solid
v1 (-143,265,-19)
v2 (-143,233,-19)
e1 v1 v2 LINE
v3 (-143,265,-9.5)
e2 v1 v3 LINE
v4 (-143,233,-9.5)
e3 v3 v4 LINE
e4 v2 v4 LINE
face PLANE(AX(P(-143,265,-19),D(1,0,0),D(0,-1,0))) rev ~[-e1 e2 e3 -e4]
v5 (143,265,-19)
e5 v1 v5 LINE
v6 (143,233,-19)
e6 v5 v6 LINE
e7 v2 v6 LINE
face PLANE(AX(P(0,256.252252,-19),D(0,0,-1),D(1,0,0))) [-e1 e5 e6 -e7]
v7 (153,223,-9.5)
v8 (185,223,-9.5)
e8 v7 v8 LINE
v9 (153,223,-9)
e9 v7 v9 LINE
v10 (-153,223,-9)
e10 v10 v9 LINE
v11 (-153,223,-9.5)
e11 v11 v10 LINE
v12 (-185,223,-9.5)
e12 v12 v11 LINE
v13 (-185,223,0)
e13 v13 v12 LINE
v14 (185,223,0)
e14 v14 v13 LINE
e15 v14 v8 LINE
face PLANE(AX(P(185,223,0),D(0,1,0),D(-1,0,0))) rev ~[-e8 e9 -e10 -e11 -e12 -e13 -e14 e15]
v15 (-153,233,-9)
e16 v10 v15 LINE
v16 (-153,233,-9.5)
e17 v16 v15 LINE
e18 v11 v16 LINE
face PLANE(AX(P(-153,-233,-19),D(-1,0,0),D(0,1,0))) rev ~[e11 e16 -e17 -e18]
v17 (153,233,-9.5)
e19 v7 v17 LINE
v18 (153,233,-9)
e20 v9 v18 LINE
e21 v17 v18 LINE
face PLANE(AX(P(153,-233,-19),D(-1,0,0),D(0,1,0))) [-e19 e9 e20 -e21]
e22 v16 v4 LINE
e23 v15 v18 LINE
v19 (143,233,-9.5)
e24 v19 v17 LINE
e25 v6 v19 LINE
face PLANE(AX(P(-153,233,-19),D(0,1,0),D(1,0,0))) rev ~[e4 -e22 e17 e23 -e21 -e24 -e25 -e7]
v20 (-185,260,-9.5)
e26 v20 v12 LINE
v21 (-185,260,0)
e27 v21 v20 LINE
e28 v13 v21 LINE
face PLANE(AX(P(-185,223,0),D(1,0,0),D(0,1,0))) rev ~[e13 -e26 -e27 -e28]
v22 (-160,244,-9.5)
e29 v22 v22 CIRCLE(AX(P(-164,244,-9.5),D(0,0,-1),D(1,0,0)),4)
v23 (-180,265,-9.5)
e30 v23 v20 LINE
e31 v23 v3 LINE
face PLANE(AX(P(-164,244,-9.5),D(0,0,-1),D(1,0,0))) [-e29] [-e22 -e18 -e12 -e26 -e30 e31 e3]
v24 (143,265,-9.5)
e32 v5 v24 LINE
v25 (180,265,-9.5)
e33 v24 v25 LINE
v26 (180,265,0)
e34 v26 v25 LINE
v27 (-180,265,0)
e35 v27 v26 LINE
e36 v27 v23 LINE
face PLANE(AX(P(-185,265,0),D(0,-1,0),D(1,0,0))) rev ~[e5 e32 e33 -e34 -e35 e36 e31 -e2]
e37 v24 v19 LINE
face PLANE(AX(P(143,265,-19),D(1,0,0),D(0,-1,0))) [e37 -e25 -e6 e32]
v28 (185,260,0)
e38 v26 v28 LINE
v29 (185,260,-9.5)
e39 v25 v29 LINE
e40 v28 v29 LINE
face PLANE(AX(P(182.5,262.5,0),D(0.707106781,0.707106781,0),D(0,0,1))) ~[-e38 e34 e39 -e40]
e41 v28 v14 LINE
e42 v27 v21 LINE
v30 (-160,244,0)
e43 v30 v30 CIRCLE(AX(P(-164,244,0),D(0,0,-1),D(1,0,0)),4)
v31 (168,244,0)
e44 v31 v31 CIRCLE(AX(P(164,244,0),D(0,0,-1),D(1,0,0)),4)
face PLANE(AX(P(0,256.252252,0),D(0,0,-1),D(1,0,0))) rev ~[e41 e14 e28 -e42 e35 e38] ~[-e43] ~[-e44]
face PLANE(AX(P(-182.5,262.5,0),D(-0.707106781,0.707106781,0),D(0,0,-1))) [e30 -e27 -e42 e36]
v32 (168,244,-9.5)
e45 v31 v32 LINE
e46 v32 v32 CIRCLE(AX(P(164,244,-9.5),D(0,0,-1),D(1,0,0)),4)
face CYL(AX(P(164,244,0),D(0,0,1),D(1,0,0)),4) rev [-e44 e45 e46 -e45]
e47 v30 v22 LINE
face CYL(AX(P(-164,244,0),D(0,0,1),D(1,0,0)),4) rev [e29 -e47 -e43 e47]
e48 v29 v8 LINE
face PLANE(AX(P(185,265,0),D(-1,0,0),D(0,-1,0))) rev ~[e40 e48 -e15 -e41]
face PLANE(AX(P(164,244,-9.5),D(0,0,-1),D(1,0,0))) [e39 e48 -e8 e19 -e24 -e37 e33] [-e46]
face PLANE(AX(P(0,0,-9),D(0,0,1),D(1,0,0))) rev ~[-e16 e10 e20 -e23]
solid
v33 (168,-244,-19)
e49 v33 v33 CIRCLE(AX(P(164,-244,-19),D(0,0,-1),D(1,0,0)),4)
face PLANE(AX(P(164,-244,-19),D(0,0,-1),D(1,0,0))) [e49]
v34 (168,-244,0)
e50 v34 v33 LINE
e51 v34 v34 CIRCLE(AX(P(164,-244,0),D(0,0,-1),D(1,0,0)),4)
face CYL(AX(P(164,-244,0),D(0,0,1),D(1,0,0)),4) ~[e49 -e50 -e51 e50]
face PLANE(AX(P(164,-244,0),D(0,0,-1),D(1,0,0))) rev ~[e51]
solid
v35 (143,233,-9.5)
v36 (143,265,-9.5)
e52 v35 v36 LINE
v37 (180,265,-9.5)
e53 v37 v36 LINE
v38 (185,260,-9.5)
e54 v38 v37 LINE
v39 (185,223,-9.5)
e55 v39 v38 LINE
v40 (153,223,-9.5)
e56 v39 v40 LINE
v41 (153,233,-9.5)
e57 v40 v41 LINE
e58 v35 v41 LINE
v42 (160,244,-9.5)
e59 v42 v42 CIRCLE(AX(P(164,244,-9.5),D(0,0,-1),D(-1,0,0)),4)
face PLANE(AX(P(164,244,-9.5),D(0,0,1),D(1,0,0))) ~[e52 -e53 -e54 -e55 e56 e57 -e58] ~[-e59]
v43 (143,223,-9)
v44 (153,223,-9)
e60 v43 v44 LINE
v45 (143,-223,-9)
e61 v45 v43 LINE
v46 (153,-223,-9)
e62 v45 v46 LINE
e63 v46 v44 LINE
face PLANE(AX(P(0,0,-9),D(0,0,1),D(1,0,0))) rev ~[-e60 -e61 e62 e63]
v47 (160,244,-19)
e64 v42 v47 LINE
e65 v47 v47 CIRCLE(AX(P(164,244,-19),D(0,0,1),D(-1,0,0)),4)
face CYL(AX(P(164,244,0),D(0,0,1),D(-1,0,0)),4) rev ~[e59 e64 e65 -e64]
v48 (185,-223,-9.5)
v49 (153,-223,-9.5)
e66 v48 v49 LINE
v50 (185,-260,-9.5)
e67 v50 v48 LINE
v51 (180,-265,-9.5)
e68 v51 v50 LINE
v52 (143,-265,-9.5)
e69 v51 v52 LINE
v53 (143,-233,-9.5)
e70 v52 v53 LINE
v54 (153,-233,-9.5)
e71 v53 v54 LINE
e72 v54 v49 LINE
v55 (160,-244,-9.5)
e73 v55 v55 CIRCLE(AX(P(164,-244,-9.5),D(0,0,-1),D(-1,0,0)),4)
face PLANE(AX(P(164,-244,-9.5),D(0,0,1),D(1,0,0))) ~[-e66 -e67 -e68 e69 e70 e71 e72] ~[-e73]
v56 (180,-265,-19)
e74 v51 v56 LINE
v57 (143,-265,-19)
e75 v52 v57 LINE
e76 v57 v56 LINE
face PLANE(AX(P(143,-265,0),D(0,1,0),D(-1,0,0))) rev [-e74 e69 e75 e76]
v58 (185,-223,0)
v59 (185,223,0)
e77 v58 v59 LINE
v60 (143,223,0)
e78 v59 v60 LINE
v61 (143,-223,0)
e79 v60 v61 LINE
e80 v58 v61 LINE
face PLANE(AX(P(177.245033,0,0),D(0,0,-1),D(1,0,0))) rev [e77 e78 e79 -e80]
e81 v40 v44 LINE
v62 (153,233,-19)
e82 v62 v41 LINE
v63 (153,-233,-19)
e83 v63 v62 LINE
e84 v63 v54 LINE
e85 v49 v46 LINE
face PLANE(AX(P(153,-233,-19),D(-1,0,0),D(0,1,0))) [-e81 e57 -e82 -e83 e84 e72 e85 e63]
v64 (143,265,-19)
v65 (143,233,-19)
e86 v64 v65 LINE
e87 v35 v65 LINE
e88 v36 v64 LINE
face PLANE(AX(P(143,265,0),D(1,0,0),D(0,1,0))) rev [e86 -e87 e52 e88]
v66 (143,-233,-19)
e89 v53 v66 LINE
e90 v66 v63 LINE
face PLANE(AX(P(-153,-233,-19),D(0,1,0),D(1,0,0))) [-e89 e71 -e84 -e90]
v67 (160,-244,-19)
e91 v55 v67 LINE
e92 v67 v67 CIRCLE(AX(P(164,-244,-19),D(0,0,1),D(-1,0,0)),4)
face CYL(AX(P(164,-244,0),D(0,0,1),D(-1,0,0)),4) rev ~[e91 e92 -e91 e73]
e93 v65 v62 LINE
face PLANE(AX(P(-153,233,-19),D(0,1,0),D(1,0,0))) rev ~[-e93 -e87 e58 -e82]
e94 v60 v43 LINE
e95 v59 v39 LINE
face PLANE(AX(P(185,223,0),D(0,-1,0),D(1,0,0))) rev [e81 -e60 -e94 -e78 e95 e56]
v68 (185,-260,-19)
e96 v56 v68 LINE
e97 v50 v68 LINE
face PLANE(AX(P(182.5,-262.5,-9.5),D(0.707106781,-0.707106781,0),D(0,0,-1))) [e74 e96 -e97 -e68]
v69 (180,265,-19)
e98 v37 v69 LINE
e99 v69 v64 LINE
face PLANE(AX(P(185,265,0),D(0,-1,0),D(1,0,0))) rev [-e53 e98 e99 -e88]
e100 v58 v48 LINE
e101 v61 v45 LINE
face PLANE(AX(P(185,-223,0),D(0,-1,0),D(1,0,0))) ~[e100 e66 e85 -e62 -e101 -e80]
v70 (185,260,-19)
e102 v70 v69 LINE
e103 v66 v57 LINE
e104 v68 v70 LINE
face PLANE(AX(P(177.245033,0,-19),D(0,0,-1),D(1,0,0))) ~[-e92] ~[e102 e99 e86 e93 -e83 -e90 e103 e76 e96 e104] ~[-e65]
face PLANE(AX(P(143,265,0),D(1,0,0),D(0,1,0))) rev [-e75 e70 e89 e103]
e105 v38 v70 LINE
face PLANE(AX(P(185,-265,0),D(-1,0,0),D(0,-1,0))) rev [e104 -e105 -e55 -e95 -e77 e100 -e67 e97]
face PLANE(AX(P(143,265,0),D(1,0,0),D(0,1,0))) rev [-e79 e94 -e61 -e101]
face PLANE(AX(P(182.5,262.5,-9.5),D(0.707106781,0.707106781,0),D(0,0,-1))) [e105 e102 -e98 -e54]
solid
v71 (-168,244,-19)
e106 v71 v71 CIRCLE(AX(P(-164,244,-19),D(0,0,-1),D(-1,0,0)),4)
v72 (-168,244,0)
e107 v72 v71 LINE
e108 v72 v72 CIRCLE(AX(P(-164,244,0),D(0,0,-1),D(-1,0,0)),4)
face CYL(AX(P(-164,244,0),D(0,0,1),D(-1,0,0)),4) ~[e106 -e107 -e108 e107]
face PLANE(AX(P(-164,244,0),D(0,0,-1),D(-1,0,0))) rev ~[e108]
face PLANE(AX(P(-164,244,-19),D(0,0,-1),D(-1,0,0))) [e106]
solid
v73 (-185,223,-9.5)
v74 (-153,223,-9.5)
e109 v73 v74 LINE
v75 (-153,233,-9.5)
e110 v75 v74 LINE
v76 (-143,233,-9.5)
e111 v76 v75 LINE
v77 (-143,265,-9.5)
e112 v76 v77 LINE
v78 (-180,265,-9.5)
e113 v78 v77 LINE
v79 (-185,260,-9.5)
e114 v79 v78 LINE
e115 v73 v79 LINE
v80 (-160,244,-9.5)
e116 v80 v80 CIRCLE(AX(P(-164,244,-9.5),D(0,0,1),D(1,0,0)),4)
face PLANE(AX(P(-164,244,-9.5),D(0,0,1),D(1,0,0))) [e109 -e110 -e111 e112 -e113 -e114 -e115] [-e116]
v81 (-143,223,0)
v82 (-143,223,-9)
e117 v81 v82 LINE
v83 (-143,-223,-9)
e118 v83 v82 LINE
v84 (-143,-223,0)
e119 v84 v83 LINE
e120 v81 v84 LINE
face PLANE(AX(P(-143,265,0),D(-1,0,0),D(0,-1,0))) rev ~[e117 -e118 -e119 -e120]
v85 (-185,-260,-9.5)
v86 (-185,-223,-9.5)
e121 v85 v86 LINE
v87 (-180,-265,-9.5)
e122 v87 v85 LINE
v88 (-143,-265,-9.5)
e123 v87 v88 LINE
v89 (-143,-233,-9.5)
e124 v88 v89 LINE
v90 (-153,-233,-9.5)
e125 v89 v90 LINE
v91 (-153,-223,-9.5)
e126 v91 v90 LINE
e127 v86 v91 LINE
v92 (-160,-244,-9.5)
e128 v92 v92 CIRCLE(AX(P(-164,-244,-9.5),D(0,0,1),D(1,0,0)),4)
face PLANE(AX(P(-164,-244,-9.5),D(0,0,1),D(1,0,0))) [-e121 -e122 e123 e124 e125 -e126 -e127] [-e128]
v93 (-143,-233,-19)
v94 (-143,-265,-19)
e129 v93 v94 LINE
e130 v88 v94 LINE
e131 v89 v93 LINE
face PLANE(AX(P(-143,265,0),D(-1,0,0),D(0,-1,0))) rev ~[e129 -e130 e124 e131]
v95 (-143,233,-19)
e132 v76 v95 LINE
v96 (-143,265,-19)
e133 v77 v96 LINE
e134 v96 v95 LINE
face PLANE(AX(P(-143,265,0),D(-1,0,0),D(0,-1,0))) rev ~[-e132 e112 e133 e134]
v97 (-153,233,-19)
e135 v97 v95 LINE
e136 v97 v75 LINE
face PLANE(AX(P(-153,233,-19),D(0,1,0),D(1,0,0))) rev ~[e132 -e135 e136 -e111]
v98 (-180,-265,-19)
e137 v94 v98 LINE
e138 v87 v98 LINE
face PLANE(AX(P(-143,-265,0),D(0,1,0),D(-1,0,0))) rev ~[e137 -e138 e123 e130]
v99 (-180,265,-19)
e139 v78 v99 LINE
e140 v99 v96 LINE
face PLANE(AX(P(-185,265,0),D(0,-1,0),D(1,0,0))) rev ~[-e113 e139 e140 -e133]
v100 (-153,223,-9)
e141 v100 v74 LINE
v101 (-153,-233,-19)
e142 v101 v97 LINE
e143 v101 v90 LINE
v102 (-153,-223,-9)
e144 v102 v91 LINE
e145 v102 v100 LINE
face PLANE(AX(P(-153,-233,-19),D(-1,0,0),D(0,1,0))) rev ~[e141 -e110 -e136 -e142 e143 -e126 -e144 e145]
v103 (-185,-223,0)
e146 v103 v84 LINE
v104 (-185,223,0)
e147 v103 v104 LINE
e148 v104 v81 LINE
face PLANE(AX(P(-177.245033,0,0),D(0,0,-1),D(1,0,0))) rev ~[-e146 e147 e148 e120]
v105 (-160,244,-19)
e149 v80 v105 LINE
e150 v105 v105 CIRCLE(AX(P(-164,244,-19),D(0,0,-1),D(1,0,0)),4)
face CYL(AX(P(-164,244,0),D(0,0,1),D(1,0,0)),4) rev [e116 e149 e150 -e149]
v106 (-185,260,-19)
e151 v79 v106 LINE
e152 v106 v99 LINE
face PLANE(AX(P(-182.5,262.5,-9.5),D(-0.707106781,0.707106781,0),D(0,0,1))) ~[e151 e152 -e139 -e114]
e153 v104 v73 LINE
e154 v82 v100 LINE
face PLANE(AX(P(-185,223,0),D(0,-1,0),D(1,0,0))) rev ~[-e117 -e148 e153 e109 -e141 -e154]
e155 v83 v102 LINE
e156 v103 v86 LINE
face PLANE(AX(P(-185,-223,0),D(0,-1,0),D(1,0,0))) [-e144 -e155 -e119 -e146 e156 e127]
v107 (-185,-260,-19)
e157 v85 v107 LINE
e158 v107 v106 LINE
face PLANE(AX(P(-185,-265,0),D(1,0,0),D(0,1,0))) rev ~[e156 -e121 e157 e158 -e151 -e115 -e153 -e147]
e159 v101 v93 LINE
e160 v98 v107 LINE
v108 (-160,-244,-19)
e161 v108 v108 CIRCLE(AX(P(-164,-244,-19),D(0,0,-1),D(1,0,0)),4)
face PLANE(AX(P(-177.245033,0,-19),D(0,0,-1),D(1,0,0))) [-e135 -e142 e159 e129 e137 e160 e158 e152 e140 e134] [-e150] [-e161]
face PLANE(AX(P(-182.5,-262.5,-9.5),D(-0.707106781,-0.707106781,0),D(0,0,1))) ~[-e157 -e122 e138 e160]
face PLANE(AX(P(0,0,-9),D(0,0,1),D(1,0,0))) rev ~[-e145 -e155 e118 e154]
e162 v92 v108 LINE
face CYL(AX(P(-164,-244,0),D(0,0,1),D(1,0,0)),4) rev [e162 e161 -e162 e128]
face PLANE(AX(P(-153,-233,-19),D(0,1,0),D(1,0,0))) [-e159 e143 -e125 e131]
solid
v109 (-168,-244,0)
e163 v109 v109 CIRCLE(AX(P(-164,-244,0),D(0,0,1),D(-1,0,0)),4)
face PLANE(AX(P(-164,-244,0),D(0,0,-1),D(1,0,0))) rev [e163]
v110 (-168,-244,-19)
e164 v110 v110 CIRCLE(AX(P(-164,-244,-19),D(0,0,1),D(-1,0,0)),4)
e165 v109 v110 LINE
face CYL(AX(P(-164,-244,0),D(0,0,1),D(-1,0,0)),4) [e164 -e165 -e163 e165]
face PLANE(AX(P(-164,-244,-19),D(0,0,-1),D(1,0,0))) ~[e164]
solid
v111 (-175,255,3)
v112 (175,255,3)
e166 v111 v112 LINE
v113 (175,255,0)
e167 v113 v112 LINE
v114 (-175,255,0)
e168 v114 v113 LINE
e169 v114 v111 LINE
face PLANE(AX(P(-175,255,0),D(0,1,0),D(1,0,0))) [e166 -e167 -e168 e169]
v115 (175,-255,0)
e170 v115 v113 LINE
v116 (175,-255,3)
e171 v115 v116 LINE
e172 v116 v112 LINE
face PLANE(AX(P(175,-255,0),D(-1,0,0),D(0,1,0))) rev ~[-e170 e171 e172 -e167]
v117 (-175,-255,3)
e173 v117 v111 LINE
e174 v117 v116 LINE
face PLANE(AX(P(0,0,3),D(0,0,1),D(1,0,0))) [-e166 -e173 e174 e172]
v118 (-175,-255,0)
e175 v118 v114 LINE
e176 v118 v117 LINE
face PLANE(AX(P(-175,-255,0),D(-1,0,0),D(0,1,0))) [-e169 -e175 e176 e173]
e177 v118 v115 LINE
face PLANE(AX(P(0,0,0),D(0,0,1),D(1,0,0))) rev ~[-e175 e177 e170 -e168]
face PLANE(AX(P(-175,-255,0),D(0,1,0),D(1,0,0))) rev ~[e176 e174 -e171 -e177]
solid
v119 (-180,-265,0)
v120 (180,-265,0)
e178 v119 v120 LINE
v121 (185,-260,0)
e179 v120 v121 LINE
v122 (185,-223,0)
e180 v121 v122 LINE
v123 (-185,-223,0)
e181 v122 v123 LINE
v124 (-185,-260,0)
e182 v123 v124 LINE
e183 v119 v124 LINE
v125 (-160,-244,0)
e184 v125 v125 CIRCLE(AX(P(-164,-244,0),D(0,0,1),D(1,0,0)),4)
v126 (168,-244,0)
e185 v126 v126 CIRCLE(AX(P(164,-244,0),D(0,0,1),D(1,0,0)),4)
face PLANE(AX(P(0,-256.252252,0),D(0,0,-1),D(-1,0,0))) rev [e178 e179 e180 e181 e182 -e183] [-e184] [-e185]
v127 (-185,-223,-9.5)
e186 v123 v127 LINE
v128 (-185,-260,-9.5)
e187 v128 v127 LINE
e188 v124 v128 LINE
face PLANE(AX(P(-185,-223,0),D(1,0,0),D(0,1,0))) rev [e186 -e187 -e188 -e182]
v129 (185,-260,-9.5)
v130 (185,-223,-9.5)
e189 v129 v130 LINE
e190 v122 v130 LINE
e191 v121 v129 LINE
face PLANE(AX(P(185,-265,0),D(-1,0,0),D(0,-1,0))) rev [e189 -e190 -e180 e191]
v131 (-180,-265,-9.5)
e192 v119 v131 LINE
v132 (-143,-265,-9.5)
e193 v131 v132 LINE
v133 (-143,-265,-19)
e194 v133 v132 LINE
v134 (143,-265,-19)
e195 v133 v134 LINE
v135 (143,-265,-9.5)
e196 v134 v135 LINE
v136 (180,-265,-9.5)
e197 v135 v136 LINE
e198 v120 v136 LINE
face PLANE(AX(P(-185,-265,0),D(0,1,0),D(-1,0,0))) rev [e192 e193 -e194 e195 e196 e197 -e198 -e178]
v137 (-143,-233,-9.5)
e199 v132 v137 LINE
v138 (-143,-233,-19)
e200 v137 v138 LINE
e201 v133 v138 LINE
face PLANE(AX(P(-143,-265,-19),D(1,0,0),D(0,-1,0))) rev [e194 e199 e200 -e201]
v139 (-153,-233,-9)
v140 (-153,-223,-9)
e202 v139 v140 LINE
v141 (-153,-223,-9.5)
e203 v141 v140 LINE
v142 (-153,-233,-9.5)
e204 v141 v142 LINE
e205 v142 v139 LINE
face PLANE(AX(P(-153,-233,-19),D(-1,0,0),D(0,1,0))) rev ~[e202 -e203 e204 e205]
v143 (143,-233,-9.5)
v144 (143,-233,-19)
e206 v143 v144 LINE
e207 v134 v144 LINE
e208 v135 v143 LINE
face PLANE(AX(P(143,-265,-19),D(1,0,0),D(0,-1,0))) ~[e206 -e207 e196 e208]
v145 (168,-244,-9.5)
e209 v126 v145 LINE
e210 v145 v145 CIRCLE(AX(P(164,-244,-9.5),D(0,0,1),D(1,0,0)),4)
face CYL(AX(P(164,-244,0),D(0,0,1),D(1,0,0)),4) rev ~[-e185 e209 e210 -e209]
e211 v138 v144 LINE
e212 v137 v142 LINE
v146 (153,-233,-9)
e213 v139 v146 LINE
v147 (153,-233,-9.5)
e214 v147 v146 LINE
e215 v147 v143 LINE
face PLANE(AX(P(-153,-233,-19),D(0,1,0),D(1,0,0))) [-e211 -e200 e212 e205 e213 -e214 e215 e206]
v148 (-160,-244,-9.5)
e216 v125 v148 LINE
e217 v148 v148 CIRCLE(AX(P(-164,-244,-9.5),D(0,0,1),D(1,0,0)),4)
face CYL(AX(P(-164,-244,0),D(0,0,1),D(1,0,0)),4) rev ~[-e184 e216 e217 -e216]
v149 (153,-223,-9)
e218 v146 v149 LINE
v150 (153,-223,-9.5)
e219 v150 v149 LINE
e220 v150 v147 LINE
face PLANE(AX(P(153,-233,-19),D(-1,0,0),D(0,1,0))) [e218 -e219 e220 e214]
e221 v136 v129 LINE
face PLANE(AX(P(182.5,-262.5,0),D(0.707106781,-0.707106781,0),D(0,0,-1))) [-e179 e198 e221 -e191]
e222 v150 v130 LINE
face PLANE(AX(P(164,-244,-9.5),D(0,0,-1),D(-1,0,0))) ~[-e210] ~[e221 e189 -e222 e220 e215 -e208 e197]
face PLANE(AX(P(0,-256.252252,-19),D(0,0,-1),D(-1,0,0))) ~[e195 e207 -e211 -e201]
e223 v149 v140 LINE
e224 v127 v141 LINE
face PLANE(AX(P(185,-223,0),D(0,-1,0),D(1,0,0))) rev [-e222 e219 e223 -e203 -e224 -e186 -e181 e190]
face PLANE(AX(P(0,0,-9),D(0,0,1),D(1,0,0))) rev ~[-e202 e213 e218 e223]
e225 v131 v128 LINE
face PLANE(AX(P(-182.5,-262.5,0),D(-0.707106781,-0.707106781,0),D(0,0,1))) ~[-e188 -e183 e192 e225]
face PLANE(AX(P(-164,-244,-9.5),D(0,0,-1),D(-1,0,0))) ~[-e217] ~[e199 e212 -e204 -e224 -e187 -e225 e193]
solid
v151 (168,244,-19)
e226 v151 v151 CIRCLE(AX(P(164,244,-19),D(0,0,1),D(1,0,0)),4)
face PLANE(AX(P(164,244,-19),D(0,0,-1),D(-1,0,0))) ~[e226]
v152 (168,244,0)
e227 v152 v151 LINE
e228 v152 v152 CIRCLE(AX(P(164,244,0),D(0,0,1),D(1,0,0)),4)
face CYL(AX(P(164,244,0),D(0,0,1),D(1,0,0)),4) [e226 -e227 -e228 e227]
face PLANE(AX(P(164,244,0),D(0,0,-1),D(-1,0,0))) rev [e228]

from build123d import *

# Parameters (mm, degrees)
F3_W      = 350
F3_H      = 510
F4_DEPTH  = 3
F5_W      = 350
F5_H      = 32
F5_R      = 4
F6_DEPTH  = 19
F7_W      = 42
F7_H      = 42
F7_R      = 4
F8_DEPTH  = 9.5
F9_SIZE   = 5
F11_W     = 32
F11_H     = 510
F11_R     = 4
F12_DEPTH = 19
F13_W     = 42
F13_H     = 42
F13_R     = 4
F14_DEPTH = 9.5
F15_SIZE  = 5
F17_R     = 4
F18_DEPTH = 19
F22_W     = 306
F22_H     = 466
F22_W_2   = 286
F22_H_2   = 446
F23_DEPTH = 10


# Not quite as in the source:
# - a feature names something its author has since deleted; it is built from what else it names


with BuildPart() as f4:
    # F3 (on Top) → F4 (new body)
    with BuildSketch(Plane.XY):
        Rectangle(F3_W, F3_H)
    extrude(amount=F4_DEPTH)


with BuildPart() as f6:
    # F5 (on face) → F6 (new body)
    with BuildSketch(Plane(origin=(0, 0, 0), x_dir=(1, 0, 0), z_dir=(0, 0, -1))):
        Polygon((-185, -265), (185, -265), (185, -223), (175, -223), (175, -255), (-175, -255), (-175, -223), (-185, -223), align=None)
        with Locations((0, -239)):
            Rectangle(F5_W, F5_H)
        with Locations((-164, -244)):
            Circle(F5_R, mode=Mode.SUBTRACT)
        with Locations((164, -244)):
            Circle(F5_R, mode=Mode.SUBTRACT)
    extrude(amount=F6_DEPTH)

    # F7 (on face) → F8 (cut)
    with BuildSketch(Plane(origin=(0, 0, -19), x_dir=(1, 0, 0), z_dir=(0, 0, -1))):
        with Locations((-164, -244)):
            Rectangle(F7_W, F7_H)
        with Locations((-164, -244)):
            Circle(F7_R, mode=Mode.SUBTRACT)
        with Locations((164, -244)):
            Rectangle(F7_W, F7_H)
        with Locations((164, -244)):
            Circle(F7_R, mode=Mode.SUBTRACT)
    extrude(amount=-F8_DEPTH, mode=Mode.SUBTRACT)

    # F9
    f9_edges = [f6.edges().sort_by_distance(p)[0] for p in [
        (-185, 265, -4.75),
        (185, 265, -4.75),
    ]]
    chamfer(f9_edges, length=F9_SIZE)


with BuildPart() as f10_1:
    # F10: instance of F6
    add(f6.part.mirror(Plane.XZ))


with BuildPart() as f12:
    # F11 (on face) → F12 (new body)
    with BuildSketch(Plane(origin=(0, 0, 0), x_dir=(1, 0, 0), z_dir=(0, 0, -1))):
        Polygon((-143, 265), (-185, 265), (-185, -265), (-143, -265), (-143, -255), (-175, -255), (-175, 255), (-143, 255), align=None)
        with Locations((-159, 0)):
            Rectangle(F11_W, F11_H)
        with Locations((-164, -244)):
            Circle(F11_R, mode=Mode.SUBTRACT)
        with Locations((-164, 244)):
            Circle(F11_R, mode=Mode.SUBTRACT)
    extrude(amount=F12_DEPTH)

    # F13 (on face) → F14 (cut)
    with BuildSketch(Plane.XY):
        with Locations((-164, 244)):
            Rectangle(F13_W, F13_H)
        with Locations((-164, 244)):
            Circle(F13_R, mode=Mode.SUBTRACT)
        with Locations((-164, -244)):
            Rectangle(F13_W, F13_H)
        with Locations((-164, -244)):
            Circle(F13_R, mode=Mode.SUBTRACT)
    extrude(amount=-F14_DEPTH, mode=Mode.SUBTRACT)

    # F15
    f15_edges = [f12.edges().sort_by_distance(p)[0] for p in [
        (-185, -265, -14.25),
        (-185, 265, -14.25),
    ]]
    chamfer(f15_edges, length=F15_SIZE)


with BuildPart() as f16_1:
    # F16: instance of F12
    add(f12.part.mirror(Plane.YZ))


with BuildPart() as f18:
    # F17 (on face) → F18 (new body)
    with BuildSketch(Plane(origin=(0, 0, 0), x_dir=(1, 0, 0), z_dir=(0, 0, -1))):
        with Locations((164, 244)):
            Circle(F17_R)
    extrude(amount=F18_DEPTH)


with BuildPart() as f19_1:
    # F19: instance of F18
    add(f18.part.mirror(Plane.YZ))


with BuildPart() as f20_1:
    # F20: instance of F18
    add(f18.part.mirror(Plane.XZ))


with BuildPart() as f20_2:
    # F20: instance of F19_1
    add(f19_1.part.mirror(Plane.XZ))


with BuildPart() as f23_tool:
    # F22 (on offset) → F23 (new body)
    with BuildSketch(Plane.XY.offset(-19)):
        Rectangle(F22_W, F22_H)
        Rectangle(F22_W_2, F22_H_2, mode=Mode.SUBTRACT)
    extrude(amount=F23_DEPTH)


with BuildPart() as f6_1:
    add(f6.part)

    # F23: cut by f23_tool
    add(f23_tool.part, mode=Mode.SUBTRACT)


with BuildPart() as f10_1_1:
    add(f10_1.part)

    # F23: cut by f23_tool
    add(f23_tool.part, mode=Mode.SUBTRACT)


with BuildPart() as f12_1:
    add(f12.part)

    # F23: cut by f23_tool
    add(f23_tool.part, mode=Mode.SUBTRACT)


with BuildPart() as f16_1_1:
    add(f16_1.part)

    # F23: cut by f23_tool
    add(f23_tool.part, mode=Mode.SUBTRACT)


solid = Compound([f4.part, f18.part, f19_1.part, f20_1.part, f20_2.part, f6_1.part, f10_1_1.part, f12_1.part, f16_1_1.part])
